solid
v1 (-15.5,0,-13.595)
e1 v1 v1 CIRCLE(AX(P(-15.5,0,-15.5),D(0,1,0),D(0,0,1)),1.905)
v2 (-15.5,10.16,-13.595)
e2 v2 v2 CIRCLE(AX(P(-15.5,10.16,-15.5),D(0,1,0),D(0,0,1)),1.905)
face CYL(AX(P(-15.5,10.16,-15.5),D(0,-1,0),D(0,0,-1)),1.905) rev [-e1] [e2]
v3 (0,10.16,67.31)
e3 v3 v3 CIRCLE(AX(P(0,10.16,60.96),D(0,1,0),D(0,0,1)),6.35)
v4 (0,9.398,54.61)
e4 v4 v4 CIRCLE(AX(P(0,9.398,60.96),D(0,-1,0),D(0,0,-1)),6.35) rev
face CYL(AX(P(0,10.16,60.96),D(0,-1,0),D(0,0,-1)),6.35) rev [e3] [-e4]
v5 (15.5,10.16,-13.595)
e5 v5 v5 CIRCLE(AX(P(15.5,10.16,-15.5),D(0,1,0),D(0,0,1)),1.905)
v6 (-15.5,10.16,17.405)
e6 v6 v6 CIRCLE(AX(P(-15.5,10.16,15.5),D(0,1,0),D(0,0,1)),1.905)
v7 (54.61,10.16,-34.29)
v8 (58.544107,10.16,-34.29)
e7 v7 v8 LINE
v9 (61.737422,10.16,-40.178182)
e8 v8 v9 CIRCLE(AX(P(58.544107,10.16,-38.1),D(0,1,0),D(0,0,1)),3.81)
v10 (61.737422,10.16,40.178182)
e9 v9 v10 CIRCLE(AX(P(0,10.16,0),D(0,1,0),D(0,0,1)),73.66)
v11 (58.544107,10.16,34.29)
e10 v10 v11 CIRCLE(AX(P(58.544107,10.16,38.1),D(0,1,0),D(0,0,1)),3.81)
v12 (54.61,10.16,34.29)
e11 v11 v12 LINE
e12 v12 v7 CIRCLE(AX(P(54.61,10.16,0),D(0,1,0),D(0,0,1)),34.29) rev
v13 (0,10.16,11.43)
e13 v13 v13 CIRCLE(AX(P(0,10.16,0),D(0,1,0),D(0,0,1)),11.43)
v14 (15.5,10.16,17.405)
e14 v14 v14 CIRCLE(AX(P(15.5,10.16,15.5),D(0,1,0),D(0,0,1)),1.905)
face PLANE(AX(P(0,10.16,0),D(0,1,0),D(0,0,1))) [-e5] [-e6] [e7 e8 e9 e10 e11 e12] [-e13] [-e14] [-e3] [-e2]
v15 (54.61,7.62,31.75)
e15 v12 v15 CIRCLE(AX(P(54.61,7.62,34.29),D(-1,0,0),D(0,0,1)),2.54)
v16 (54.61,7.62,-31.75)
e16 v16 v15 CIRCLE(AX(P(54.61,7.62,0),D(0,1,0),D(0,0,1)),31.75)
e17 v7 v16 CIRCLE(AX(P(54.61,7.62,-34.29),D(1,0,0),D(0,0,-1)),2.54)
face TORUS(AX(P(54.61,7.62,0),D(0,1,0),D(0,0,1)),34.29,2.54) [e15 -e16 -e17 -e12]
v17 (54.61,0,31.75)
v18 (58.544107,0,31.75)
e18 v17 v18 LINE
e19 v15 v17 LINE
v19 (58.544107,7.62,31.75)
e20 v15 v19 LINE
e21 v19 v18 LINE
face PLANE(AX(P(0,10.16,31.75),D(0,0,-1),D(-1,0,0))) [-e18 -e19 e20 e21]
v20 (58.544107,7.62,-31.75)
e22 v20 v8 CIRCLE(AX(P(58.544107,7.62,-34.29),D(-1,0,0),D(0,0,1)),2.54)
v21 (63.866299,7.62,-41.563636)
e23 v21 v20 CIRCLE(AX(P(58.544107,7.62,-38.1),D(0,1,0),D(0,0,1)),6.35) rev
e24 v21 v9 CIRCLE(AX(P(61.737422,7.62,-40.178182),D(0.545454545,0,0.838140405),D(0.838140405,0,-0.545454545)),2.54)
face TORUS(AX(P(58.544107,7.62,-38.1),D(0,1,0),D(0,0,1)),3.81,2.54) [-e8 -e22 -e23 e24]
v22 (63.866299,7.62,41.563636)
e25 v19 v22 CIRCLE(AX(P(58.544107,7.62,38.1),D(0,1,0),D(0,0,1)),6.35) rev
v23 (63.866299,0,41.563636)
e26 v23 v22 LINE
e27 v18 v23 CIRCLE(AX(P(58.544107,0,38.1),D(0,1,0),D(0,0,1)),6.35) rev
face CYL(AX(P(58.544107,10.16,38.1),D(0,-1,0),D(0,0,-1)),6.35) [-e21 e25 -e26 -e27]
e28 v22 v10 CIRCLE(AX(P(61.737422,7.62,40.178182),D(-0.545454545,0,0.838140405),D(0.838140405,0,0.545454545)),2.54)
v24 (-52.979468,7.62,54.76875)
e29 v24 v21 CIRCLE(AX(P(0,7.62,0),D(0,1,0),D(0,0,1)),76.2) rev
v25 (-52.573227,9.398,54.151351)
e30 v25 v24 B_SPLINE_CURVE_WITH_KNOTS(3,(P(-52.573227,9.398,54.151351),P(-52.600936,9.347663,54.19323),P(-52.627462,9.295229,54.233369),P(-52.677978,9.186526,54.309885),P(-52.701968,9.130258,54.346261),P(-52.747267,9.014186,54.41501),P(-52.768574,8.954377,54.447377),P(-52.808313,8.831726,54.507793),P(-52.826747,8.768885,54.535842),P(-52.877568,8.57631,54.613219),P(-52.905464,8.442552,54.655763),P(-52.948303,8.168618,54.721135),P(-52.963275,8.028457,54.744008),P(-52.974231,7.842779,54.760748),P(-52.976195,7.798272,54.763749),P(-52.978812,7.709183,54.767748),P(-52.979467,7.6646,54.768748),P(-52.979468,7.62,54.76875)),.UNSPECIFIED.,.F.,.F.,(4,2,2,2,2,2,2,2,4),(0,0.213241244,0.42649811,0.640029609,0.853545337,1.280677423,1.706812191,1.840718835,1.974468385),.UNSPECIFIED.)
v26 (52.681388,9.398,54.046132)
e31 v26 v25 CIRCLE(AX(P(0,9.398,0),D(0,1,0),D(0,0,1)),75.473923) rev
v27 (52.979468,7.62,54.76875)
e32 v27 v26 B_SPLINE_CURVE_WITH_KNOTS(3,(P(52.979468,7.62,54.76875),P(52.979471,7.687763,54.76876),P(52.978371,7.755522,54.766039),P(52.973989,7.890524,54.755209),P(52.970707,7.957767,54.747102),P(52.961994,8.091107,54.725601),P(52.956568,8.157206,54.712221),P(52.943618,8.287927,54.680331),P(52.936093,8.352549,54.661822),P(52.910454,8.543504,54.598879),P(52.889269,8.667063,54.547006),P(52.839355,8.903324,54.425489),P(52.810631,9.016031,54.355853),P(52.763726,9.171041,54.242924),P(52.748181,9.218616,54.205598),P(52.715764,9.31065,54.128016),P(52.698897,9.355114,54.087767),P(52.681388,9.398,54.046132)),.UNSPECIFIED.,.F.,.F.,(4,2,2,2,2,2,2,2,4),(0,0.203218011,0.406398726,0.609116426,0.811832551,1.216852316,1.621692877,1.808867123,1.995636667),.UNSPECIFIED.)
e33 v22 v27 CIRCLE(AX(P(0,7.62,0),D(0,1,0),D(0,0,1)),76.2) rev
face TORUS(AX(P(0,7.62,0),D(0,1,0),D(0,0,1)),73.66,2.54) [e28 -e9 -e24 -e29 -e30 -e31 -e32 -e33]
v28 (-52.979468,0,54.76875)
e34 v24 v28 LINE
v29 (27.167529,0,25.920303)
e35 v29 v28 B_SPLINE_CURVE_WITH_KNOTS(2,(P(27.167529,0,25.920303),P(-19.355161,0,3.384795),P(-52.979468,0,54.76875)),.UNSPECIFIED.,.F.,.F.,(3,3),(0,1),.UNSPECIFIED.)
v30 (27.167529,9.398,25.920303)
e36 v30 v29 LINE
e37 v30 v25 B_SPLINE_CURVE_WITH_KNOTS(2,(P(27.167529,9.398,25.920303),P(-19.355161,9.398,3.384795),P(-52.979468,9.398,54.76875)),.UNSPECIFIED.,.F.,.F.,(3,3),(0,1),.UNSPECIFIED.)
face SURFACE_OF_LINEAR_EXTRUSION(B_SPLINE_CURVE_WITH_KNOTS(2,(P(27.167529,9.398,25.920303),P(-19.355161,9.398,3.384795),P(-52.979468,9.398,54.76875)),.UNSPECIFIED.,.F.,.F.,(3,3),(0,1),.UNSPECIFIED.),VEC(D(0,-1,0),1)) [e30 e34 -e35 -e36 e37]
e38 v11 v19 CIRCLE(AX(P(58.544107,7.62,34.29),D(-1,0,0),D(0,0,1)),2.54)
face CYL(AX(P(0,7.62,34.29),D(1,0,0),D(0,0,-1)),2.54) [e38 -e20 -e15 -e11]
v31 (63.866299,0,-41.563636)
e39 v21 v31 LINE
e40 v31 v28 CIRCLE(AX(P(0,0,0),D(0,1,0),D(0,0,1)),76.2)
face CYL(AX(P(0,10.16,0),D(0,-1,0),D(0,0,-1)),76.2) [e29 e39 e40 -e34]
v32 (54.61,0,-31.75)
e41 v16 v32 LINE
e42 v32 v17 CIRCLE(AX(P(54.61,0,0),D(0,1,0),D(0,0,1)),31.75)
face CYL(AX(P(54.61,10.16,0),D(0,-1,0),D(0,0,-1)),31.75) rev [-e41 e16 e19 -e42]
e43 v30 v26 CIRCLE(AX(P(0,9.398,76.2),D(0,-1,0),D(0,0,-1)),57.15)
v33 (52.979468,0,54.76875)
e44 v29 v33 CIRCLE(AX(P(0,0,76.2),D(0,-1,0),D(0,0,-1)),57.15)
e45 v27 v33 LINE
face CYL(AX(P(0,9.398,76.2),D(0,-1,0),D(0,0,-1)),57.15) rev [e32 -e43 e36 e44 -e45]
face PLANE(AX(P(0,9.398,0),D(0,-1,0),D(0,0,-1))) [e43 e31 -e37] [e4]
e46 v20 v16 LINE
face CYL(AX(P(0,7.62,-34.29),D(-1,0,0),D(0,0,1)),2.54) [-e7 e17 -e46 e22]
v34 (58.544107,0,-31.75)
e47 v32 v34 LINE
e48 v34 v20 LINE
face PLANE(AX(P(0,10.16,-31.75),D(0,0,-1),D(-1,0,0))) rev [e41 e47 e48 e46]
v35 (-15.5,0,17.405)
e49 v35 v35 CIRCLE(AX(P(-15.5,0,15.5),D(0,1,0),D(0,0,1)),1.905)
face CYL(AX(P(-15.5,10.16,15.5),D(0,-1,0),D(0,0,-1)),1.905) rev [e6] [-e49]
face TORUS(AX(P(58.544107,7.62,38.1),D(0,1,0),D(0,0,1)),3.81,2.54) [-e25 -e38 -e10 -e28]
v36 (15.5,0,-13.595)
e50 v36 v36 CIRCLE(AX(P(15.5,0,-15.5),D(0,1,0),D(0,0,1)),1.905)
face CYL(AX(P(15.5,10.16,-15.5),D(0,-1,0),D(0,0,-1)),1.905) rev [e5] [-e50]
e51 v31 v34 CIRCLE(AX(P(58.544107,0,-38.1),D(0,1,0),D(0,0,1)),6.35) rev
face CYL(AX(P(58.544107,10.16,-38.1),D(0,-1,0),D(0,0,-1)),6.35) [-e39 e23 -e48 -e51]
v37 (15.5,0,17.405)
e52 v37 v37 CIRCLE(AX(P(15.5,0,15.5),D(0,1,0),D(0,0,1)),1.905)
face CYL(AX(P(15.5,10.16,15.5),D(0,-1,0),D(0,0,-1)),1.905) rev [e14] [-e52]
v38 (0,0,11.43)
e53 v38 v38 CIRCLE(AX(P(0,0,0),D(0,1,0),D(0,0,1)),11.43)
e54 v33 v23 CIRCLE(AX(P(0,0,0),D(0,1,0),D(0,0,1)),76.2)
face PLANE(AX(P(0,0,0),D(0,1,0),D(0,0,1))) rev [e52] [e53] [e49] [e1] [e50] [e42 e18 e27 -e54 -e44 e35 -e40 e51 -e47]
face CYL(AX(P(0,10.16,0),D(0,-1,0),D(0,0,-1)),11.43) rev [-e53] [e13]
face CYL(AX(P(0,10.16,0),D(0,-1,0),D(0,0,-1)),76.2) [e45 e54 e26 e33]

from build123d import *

# Parameters (mm, degrees)
SKETCH1_R           = 6.35
SKETCH1_R_2         = 1.905
SKETCH1_R_3         = 11.43
BOSS_EXTRUDE1_DEPTH = 10.16
SKETCH8_R           = 6.35
CUT_EXTRUDE3_DEPTH  = 9.398
FILLET1_R           = 6.35
FILLET3_R           = 2.54


with BuildPart() as part:
    # Sketch1 → Boss-Extrude1 (new body)
    with BuildSketch(Plane(origin=(0, 0, 0), x_dir=(1, 0, 0), z_dir=(0, 1, 0))):
        with BuildLine():
            ThreePointArc((54.61, -31.75), (22.86, 0), (54.61, 31.75))
            Line((54.61, 31.75), (69.270321928, 31.75))
            ThreePointArc((69.270321928, 31.75), (-76.2, 0), (69.270321928, -31.75))
            Line((69.270321928, -31.75), (54.61, -31.75))
        make_face()
        with Locations(Location((0, -60.96, 0), (0, 0, 270))):
            Circle(SKETCH1_R, mode=Mode.SUBTRACT)
        with Locations(Location((-15.499999988, -15.499999988, 0), (0, 0, 270))):
            Circle(SKETCH1_R_2, mode=Mode.SUBTRACT)
        with Locations(Location((15.499999988, -15.499999988, 0), (0, 0, 270))):
            Circle(SKETCH1_R_2, mode=Mode.SUBTRACT)
        with Locations(Location((-15.499999988, 15.499999988, 0), (0, 0, 270))):
            Circle(SKETCH1_R_2, mode=Mode.SUBTRACT)
        with Locations(Location((0, 0, 0), (0, 0, 270))):
            Circle(SKETCH1_R_3, mode=Mode.SUBTRACT)
        with Locations(Location((15.499999988, 15.499999988, 0), (0, 0, 270))):
            Circle(SKETCH1_R_2, mode=Mode.SUBTRACT)
    extrude(amount=BOSS_EXTRUDE1_DEPTH)

    # Sketch8 → Cut-Extrude3 (cut)
    with BuildSketch(Plane.XZ):
        with BuildLine():
            add(Edge.make_bspline(
                [(27.167528595, 25.920303401), (12.984356547, 19.050000027), (1.04e-07, 19.05)],
                knots=[0, 0, 0, 0.304865692, 0.304865692, 0.304865692], degree=2))
            ThreePointArc((27.167528595, 25.920303401), (42.590415369, 38.092533294), (52.979467942, 54.76875))
            ThreePointArc((52.979467942, 54.76875), (0, 76.2), (-52.979467942, 54.76875))
            add(Edge.make_bspline(
                [(1.04e-07, 19.05), (-29.606058837, 19.049999938), (-52.979467942, 54.76875)],
                knots=[0.304865692, 0.304865692, 0.304865692, 1, 1, 1], degree=2))
        make_face()
        with Locations(Location((0, 60.96, 0), (0, 0, 270))):
            Circle(SKETCH8_R, mode=Mode.SUBTRACT)
    extrude(amount=-CUT_EXTRUDE3_DEPTH, mode=Mode.SUBTRACT)

    # Fillet1
    fillet1_edges = [part.edges().sort_by_distance(p)[0] for p in [
        (69.270321928, 5.08, -31.75),
        (69.270321928, 5.08, 31.75),
    ]]
    fillet(fillet1_edges, radius=FILLET1_R)

    # Fillet3
    # the kernel refuses this fillet: 2.54 mm, written as the material it takes off along each edge
    with BuildSketch(Plane(origin=(54.61, 10.16, -31.75), x_dir=(0, 0, -1), z_dir=(1, 0, 0))) as fillet3_piece_1:
        with BuildLine():
            CenterArc((FILLET3_R, -FILLET3_R), FILLET3_R, 90, 90)
            Line((0, -FILLET3_R), (0, 0))
            Line((0, 0), (FILLET3_R, 0))
        make_face()
    extrude(amount=3.934107304, mode=Mode.SUBTRACT)
    with BuildSketch(Plane(origin=(58.544107304, 10.16, -38.1), x_dir=(0, 0, 1), z_dir=(-1, 0, 0))) as fillet3_piece_2:
        with BuildLine():
            CenterArc((6.35 - FILLET3_R, -FILLET3_R), FILLET3_R, 0, 90)
            Line((6.35, -FILLET3_R), (6.35, 0))
            Line((6.35, 0), (6.35 - FILLET3_R, 0))
        make_face()
    revolve(axis=Axis((58.544107304, 10.16, -38.1), (0, 1, 0)), revolution_arc=123.055731151, mode=Mode.SUBTRACT)
    with BuildSketch(Plane(origin=(0, 10.16, 0), x_dir=(0.8381404052084442, 0, -0.5454545454545454), z_dir=(0.5454545454545454, 0, 0.8381404052084442))) as fillet3_piece_3:
        with BuildLine():
            CenterArc((76.2 - FILLET3_R, -FILLET3_R), FILLET3_R, 0, 90)
            Line((76.2, -FILLET3_R), (76.2, 0))
            Line((76.2, 0), (76.2 - FILLET3_R, 0))
        make_face()
    revolve(axis=Axis((0, 10.16, 0), (0, 1, 0)), revolution_arc=293.888537698, mode=Mode.SUBTRACT)
    with BuildSketch(Plane(origin=(58.544107304, 10.16, 38.1), x_dir=(0, 0, -1), z_dir=(-1, 0, 0))) as fillet3_piece_4:
        with BuildLine():
            CenterArc((6.35 - FILLET3_R, FILLET3_R), FILLET3_R, 270, 90)
            Line((6.35 - FILLET3_R, 0), (6.35, 0))
            Line((6.35, 0), (6.35, FILLET3_R))
        make_face()
    revolve(axis=Axis((58.544107304, 10.16, 38.1), (0, -1, 0)), revolution_arc=123.055731151, mode=Mode.SUBTRACT)
    with BuildSketch(Plane(origin=(58.544107304, 10.16, 31.75), x_dir=(0, -1, 0), z_dir=(-1, 0, 0))) as fillet3_piece_5:
        with BuildLine():
            CenterArc((FILLET3_R, FILLET3_R), FILLET3_R, 180, 90)
            Line((0, FILLET3_R), (0, 0))
            Line((0, 0), (FILLET3_R, 0))
        make_face()
    extrude(amount=3.934107304, mode=Mode.SUBTRACT)
    with BuildSketch(Plane(origin=(54.61, 10.16, 0), x_dir=(0, 0, 1), z_dir=(1, 0, 0))) as fillet3_piece_6:
        with BuildLine():
            CenterArc((31.75 + FILLET3_R, FILLET3_R), FILLET3_R, 180, 90)
            Line((31.75 + FILLET3_R, 0), (31.75, 0))
            Line((31.75, 0), (31.75, FILLET3_R))
        make_face()
    revolve(axis=Axis((54.61, 10.16, 0), (0, -1, 0)), revolution_arc=180, mode=Mode.SUBTRACT)


solid = part.part
